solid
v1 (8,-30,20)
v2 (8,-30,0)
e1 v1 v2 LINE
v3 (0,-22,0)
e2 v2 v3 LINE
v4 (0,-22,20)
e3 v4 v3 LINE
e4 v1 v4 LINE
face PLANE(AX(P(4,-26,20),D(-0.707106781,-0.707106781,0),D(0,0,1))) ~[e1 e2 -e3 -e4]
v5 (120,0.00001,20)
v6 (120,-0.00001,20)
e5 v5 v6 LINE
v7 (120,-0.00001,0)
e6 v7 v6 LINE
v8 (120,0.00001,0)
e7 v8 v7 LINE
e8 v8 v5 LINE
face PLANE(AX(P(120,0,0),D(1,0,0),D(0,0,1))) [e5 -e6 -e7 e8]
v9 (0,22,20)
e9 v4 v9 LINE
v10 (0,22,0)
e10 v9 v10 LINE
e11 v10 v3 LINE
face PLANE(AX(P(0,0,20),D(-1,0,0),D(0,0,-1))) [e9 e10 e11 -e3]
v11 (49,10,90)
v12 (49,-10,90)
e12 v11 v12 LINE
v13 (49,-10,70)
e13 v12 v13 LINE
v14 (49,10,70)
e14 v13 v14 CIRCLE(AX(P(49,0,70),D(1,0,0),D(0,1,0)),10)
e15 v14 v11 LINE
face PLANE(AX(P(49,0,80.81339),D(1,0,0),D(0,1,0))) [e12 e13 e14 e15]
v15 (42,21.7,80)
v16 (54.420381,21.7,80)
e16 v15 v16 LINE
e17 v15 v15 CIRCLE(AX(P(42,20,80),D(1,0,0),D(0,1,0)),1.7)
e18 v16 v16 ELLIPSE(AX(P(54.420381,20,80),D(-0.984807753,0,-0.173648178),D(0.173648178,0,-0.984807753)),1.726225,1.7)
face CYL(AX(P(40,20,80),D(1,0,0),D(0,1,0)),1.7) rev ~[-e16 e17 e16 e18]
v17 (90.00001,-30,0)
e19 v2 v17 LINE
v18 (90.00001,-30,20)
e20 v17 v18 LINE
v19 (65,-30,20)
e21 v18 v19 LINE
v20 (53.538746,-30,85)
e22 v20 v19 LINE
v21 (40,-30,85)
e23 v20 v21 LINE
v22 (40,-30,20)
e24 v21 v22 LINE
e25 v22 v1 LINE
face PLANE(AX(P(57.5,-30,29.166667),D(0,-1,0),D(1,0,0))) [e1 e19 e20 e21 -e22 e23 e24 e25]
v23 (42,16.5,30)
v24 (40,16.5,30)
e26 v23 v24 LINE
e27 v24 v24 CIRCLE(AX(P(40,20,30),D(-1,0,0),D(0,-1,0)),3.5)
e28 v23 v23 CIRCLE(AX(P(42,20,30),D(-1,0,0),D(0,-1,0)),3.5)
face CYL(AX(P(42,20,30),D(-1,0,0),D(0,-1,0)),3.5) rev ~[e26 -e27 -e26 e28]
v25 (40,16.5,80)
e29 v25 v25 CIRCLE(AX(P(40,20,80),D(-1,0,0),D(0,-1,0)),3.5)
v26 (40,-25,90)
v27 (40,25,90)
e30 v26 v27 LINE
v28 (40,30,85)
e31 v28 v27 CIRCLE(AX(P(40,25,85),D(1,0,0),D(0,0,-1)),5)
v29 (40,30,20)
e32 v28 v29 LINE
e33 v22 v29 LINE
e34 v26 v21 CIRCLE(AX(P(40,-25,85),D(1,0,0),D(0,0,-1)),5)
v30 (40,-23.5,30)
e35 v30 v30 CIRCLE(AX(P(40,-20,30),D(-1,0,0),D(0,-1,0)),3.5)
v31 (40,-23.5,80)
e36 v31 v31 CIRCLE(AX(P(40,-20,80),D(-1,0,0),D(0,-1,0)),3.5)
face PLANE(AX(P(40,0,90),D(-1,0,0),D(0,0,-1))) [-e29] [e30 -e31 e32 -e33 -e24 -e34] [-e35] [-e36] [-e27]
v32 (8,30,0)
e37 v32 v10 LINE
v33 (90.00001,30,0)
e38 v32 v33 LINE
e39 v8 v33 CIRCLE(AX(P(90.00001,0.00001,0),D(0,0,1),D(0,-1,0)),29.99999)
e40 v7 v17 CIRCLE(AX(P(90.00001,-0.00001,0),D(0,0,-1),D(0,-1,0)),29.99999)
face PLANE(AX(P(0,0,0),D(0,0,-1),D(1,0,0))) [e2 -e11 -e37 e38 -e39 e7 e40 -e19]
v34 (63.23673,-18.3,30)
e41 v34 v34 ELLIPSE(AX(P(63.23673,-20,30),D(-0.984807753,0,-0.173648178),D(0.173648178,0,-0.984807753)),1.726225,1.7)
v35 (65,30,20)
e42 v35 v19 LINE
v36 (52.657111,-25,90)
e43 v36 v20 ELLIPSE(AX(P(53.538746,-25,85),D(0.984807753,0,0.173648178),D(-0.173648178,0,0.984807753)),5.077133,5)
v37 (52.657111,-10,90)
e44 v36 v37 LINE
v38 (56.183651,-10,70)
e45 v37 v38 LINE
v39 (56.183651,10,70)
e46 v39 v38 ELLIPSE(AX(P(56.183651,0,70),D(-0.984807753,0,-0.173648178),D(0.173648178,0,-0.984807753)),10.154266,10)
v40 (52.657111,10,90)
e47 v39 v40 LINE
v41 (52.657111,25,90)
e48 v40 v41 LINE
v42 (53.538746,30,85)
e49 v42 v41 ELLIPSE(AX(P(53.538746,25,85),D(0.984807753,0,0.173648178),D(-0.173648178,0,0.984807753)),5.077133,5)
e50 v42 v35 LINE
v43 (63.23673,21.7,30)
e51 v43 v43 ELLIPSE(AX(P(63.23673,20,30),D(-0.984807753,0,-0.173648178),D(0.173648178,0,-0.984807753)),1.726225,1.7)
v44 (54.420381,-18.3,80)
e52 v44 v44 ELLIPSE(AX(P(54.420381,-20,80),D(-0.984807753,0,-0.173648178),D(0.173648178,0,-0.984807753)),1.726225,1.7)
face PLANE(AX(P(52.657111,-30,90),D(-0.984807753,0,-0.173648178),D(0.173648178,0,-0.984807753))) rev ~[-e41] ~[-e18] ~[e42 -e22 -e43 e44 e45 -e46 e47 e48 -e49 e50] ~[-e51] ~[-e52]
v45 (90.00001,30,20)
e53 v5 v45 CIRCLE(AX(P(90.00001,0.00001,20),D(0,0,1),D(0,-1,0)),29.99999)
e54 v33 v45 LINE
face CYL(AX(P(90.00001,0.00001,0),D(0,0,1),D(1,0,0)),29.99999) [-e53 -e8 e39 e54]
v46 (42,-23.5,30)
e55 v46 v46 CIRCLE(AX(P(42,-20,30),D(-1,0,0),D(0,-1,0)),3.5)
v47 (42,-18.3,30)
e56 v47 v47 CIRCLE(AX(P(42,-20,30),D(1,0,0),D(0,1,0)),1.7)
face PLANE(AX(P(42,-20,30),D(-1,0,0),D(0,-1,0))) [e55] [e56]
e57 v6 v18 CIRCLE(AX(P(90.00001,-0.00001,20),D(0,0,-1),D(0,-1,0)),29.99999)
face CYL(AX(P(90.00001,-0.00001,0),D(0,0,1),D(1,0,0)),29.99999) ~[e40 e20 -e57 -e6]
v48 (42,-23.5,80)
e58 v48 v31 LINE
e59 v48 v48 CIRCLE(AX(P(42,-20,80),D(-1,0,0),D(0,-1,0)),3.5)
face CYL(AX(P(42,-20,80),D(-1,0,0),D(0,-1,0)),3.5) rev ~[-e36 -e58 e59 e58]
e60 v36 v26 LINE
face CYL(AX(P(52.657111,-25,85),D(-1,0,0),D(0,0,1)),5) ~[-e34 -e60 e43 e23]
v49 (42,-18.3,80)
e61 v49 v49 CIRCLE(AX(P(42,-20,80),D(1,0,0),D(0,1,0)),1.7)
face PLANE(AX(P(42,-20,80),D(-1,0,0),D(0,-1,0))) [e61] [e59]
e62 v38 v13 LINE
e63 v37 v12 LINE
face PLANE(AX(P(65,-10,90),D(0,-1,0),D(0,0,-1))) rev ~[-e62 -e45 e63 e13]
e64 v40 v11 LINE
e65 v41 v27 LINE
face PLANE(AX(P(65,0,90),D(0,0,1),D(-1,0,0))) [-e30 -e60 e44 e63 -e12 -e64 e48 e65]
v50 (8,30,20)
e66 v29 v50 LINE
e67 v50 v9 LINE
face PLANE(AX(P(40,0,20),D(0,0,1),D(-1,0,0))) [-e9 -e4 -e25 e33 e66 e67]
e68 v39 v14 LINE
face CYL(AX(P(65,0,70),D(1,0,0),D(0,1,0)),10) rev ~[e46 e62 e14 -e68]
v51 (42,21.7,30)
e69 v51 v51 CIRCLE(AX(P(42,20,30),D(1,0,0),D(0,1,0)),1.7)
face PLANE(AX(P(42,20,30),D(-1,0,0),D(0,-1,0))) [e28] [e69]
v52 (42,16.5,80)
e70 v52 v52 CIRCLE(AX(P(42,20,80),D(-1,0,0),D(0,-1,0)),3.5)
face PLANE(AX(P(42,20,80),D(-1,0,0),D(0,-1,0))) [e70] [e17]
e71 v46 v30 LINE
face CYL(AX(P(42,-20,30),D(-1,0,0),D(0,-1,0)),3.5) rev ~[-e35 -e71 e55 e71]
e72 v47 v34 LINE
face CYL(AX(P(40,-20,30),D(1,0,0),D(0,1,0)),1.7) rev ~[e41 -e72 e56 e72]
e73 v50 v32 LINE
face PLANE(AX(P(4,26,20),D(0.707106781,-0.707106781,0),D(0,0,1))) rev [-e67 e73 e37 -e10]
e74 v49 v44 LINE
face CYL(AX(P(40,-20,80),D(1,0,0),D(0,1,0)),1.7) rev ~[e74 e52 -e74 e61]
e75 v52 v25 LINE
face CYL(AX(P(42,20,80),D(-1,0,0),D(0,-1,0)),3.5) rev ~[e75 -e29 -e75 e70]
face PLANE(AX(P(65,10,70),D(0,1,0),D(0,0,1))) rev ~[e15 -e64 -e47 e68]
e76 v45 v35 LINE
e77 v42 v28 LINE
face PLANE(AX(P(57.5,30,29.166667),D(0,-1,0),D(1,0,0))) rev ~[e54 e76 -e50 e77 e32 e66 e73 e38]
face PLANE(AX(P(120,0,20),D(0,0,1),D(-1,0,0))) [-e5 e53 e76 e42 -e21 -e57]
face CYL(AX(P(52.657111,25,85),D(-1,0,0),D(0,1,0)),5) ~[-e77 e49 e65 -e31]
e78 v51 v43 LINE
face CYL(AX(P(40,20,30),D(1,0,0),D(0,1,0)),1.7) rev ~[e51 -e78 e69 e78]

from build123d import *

# Parameters (mm, degrees)
F1_DEPTH       = 30
F2_R           = 29.99999
F4_D           = 3.4
F4_CBORE_D     = 7
F4_CBORE_DEPTH = 2
F5_SIZE        = 8
F10_DEPTH      = 16
F11_DEPTH      = 60.001
F12_R          = 5


# Not quite as in the source:
# - a fillet or chamfer is up to 0.001 mm smaller than in the source, because OpenCascade refuses the exact size


with BuildPart() as f1:
    # F0 (on Front) → F1 (new body, symmetric)
    with BuildSketch(Plane.XZ):
        Polygon((0, 20), (0, 0), (120, 0), (120, 20), (65, 20), (65, 90), (40, 90), (40, 20), align=None)
    extrude(amount=F1_DEPTH, both=True)

    # F2 (radius 30 in the source; OpenCascade refuses exactly that, so slightly less here)
    f2_edges = [f1.edges().sort_by_distance(p)[0] for p in [
        (120, -30, 10),
        (120, 30, 10),
    ]]
    fillet(f2_edges, radius=F2_R)

    # F4 (through all)
    with Locations(Plane(origin=(40, 0, 0), x_dir=(0, -1, 0), z_dir=(-1, 0, 0))):
        with Locations((-20, 80), (-20, 30), (20, 30), (20, 80)):
            CounterBoreHole(F4_D / 2, F4_CBORE_D / 2, F4_CBORE_DEPTH)

    # F5
    f5_edges = [f1.edges().sort_by_distance(p)[0] for p in [
        (0, 30, 10),
        (0, -30, 10),
    ]]
    chamfer(f5_edges, length=F5_SIZE)

    # F7 (on face) → F10 (cut, through all)
    with BuildSketch(Plane.YZ.offset(65)):
        with BuildLine():
            ThreePointArc((-10, 70), (0, 80), (10, 70))
            Line((10, 70), (10, 90))
            Line((10, 90), (-10, 90))
            Line((-10, 90), (-10, 70))
        make_face()
        with BuildLine():
            ThreePointArc((-10, 70), (0, 60), (10, 70))
            ThreePointArc((10, 70), (0, 80), (-10, 70))
        make_face()
    extrude(amount=-F10_DEPTH, mode=Mode.SUBTRACT)

    # F6 (on face) → F11 (cut, through all)
    with BuildSketch(Plane.XZ.offset(30)):
        Polygon((52.6571113504, 90), (65, 20), (65, 90), align=None)
    extrude(amount=-F11_DEPTH, mode=Mode.SUBTRACT)

    # F12
    f12_edges = [f1.edges().sort_by_distance(p)[0] for p in [
        (46.328556, -30, 90),
        (46.328556, 30, 90),
    ]]
    fillet(f12_edges, radius=F12_R)


solid = f1.part
